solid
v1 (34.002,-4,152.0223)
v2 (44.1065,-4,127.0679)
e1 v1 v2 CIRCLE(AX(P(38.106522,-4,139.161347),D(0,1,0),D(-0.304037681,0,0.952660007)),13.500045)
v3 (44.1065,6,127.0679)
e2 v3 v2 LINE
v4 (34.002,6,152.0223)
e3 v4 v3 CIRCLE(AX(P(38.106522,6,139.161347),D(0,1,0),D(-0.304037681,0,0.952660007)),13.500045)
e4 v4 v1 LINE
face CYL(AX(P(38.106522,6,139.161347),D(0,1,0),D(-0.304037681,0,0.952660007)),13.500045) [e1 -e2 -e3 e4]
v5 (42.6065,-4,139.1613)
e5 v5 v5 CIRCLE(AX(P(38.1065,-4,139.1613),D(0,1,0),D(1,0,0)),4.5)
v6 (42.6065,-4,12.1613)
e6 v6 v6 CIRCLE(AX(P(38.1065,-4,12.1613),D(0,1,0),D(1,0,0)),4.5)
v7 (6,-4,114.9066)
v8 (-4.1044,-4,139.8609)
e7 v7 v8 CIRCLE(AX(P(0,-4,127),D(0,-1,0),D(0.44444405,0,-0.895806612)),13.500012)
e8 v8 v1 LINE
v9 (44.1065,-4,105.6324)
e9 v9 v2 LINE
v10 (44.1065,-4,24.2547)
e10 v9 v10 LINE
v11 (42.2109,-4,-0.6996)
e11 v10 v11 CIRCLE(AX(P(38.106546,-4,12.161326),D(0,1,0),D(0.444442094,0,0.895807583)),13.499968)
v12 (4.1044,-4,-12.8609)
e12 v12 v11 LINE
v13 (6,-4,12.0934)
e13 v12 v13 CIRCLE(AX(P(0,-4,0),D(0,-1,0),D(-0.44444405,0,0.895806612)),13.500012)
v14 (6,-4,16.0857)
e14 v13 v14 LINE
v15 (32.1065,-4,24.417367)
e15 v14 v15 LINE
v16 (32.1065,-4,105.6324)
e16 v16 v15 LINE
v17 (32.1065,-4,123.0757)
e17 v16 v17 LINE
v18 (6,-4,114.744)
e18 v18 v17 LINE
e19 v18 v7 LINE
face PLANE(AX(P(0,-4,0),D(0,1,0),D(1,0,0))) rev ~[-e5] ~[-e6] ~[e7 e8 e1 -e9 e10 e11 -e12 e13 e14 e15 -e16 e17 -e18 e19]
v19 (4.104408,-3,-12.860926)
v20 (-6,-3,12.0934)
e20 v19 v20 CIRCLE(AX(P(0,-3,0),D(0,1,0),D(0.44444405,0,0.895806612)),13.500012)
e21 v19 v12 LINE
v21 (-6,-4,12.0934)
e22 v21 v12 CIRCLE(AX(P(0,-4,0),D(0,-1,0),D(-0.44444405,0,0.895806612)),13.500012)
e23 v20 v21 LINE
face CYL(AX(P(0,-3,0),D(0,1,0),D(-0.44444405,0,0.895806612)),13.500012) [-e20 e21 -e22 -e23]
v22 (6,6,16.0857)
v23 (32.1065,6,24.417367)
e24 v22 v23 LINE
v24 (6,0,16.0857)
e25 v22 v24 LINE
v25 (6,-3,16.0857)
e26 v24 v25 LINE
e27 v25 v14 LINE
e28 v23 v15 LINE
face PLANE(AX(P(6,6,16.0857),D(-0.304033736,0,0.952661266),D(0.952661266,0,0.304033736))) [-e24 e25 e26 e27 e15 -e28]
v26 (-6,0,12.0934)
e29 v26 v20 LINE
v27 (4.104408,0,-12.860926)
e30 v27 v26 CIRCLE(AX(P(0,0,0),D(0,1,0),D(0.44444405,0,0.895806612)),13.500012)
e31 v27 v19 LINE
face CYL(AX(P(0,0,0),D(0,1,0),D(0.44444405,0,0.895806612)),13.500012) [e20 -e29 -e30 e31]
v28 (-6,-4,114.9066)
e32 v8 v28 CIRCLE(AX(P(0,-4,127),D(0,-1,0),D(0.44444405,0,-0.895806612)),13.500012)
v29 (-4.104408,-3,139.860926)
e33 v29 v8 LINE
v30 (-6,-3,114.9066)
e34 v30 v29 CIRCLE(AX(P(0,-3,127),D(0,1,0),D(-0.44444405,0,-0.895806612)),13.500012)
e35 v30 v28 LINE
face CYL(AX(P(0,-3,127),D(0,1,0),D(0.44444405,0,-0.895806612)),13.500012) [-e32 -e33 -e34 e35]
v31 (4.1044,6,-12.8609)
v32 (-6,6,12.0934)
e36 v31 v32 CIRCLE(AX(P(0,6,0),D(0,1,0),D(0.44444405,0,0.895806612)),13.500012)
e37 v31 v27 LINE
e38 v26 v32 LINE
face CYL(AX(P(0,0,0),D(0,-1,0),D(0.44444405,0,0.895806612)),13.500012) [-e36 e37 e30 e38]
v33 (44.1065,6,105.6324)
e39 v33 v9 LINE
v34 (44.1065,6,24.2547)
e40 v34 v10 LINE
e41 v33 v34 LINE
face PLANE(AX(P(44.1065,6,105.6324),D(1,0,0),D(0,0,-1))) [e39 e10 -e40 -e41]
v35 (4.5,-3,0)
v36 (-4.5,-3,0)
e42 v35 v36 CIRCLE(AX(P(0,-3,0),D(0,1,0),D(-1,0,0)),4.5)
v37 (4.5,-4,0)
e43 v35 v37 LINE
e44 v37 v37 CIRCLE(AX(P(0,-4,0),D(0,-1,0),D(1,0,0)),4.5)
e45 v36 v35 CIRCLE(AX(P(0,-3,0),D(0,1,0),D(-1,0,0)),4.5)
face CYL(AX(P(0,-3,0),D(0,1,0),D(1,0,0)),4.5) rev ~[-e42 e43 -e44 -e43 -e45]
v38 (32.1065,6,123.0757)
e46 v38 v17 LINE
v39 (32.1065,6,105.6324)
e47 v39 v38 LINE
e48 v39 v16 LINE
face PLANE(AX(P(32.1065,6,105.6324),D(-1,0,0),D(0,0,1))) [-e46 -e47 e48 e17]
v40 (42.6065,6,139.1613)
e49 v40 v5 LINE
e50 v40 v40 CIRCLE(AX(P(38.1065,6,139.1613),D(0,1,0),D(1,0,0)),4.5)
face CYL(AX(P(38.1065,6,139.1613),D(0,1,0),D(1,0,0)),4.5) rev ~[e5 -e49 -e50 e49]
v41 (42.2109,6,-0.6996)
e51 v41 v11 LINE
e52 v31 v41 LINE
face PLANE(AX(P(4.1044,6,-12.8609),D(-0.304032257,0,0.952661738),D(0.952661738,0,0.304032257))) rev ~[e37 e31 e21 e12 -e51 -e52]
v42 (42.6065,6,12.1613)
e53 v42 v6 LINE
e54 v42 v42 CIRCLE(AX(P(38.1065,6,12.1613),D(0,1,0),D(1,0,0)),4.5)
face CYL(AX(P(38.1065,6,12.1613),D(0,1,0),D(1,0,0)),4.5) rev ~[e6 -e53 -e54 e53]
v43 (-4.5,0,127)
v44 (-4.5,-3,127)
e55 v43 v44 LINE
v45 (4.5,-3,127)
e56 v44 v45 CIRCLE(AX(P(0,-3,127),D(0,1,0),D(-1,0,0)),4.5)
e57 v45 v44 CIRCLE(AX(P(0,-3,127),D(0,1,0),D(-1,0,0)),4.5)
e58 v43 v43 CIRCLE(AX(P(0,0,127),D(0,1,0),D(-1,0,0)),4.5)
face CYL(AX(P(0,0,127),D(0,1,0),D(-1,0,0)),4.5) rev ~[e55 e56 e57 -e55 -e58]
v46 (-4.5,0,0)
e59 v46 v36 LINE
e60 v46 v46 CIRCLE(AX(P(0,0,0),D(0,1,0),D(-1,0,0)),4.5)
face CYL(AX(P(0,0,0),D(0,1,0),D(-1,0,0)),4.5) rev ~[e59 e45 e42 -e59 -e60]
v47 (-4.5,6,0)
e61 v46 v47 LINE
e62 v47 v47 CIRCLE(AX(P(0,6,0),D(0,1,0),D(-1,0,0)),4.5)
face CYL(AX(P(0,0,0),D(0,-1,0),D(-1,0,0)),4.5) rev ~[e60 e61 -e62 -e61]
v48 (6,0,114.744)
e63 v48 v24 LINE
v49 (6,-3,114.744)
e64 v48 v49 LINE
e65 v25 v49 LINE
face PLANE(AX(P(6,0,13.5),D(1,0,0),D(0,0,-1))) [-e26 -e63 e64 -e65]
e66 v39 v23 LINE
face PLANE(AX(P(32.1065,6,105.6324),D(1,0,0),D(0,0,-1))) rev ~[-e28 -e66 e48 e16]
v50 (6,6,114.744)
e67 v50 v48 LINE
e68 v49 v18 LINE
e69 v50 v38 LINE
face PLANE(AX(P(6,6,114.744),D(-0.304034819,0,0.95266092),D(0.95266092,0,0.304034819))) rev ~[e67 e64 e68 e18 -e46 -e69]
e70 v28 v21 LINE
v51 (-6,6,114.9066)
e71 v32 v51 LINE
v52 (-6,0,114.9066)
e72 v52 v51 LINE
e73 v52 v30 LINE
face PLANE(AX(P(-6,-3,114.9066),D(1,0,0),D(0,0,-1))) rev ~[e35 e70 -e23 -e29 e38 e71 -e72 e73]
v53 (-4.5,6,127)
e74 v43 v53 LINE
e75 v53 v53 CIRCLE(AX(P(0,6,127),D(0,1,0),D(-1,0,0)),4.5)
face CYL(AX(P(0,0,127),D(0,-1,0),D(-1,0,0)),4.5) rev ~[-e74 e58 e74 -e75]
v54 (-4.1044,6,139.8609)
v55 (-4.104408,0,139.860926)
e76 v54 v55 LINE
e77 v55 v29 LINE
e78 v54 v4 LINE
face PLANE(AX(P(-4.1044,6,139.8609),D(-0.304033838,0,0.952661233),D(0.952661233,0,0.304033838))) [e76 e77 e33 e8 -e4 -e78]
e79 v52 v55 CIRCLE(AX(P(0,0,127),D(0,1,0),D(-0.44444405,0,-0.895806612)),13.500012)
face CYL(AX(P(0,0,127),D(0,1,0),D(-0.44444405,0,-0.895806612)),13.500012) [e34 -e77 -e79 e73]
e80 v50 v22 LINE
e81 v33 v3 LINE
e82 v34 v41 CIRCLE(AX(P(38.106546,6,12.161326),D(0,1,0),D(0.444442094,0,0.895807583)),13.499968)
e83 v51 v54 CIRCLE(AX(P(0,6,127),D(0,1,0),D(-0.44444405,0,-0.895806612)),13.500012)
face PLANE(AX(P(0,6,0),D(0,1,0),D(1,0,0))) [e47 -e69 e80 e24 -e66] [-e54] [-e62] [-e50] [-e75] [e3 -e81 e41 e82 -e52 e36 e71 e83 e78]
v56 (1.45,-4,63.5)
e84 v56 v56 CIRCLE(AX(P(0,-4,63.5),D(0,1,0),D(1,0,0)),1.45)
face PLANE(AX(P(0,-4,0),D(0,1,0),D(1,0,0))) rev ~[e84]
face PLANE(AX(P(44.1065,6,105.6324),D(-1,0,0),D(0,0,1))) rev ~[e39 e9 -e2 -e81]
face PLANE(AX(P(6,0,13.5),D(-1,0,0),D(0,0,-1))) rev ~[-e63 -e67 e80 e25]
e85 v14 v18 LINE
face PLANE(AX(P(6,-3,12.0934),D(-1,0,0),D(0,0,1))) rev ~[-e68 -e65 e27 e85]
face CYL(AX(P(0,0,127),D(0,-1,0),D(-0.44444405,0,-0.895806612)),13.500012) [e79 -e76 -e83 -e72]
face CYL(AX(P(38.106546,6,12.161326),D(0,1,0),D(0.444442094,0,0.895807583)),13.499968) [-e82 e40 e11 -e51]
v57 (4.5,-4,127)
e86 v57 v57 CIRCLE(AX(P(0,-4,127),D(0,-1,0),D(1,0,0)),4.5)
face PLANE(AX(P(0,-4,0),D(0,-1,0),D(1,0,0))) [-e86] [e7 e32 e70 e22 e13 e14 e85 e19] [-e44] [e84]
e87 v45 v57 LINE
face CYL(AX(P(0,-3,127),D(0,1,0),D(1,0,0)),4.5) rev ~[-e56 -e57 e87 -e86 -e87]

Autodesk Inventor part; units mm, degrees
ref_plane "YZ Plane" through (0, 0, 0) normal (1, 0, 0) x (0, 1, 0)
ref_plane "XZ Plane" through (0, 0, 0) normal (0, 1, 0) x (-1, 0, 0)
ref_plane "XY Plane" through (0, 0, 0) normal (0, 0, 1) x (1, 0, 0)
sketch "Sketch1" plane through (0, 0, 0) normal (0, 1, 0) x (-1, 0, 0)
  circle A0 centre (0, 0) radius 11
  arc A1 (-6, 12.0934) -> (6, 12.0934) centre (0, 0) ccw
  line L0 (-6, 13.5) -> (-6, 113.5)
  line L1 (6, 113.5) -> (6, 13.5)
  line L2 (6, 12.0934) -> (6, 13.5)
  line L3 (-6, 13.5) -> (-6, 12.0934)
  arc A2 (6, 114.9066) -> (-6, 114.9066) centre (0, 127) ccw
  circle A3 centre (0, 127) radius 11
  line L4 (6, 113.5) -> (6, 114.9066)
  line L5 (-6, 113.5) -> (-6, 114.9066)
  circle A4 centre (0, 127) radius 4.5
  circle A5 centre (0, 0) radius 4.5
  dimension "d0" = 22
  dimension "d4" = 100
  dimension "d7" = 9
  dimension "d8" = 9
extrude "Extrusion1" add sketch "Sketch1" against normal blind 3 contours A0 | L3 L0 L5 A2 L4 L1 L2 A1 | A3
extrude "Extrusion2" add sketch "Sketch1" along normal blind 6 contours A0 | L3 L0 L5 A2 L4 L1 L2 A1 | A3
sketch "Sketch2" plane through (0, -3, 0) normal (0, -1, 0) x (1, 0, 0)
  arc A0 (-6, 12.0934) -> (6, 12.0934) centre (0, 0) ccw projected
  line L0 (6, 12.0934) -> (6, 114.9066) projected
  arc A1 (6, 114.9066) -> (-6, 114.9066) centre (0, 127) ccw projected
  line L1 (-6, 114.9066) -> (-6, 12.0934) projected
  circle A2 centre (0, 0) radius 4.5 projected
  circle A3 centre (0, 127) radius 4.5 projected
extrude "Extrusion3" add sketch "Sketch2" along normal blind 1
sketch "Sketch4" plane through (0, 6, 0) normal (0, 1, 0) x (1, 0, 0)
  line L0 (-6, -12.0934) -> (-6, -114.9066) projected
  line L1 (-6, -63.5) -> (6, -63.5)
  line L2 (6, -114.9066) -> (6, -12.0934) projected
  circle A0 centre (0, -63.5) radius 1.45
  point P0 (0, 0)
  dimension "d17" = 2.9
extrude "Extrusion5" cut sketch "Sketch4" against normal up to surface (10 mm away)
sketch "Sketch5" plane through (0, 6, 0) normal (0, 1, 0) x (1, 0, 0)
  arc A0 (6, -12.0934) -> (-6, -12.0934) centre (0, 0) ccw projected
  arc A1 (44.1065, -24.2547) -> (42.2109, 0.6996) centre (38.1065, -12.1613) ccw
  arc A2 (34.002, -152.0223) -> (44.1065, -127.0679) centre (38.1065, -139.1613) ccw
  circle A3 centre (38.1065, -139.1613) radius 4.5
  circle A4 centre (38.1065, -12.1613) radius 4.5
  arc A5 (-6, -114.9066) -> (6, -114.9066) centre (0, -127) ccw projected
  line L0 (44.1065, -105.6324) -> (44.1065, -127.0679)
  line L1 (32.1065, -105.6324) -> (32.1065, -123.0757)
  line L2 (44.1065, -105.6324) -> (44.1065, -24.2547)
  line L3 (32.1065, -105.6324) -> (32.1065, -24.2547)
  line L4 (-4.1044, -139.8609) -> (35.9659, -152.649)
  line L5 (6, -114.744) -> (32.1065, -123.0757)
  line L6 (6, -114.9066) -> (6, -12.0934) projected
  line L7 (6, -16.0857) -> (34.002, -25.0223)
  line L8 (4.1044, 12.8609) -> (42.2109, 0.6996)
  point P0 (32.1065, -24.4173)
extrude "Extrusion6" add sketch "Sketch5" against normal up to surface (10 mm away) contours A0 L8 A1 L2 L0 A2 L4 A5 L6 L5 L1 L3 L7
sketch "Sketch6" plane through (0, 6, 0) normal (0, 1, 0) x (1, 0, 0)
  circle A0 centre (0, -63.5) radius 1.45 projected
  point P0 (0, 0)
extrude "Extrusion7" add sketch "Sketch6" against normal up to surface (10 mm away)
properties part number "damping_system_connector"
